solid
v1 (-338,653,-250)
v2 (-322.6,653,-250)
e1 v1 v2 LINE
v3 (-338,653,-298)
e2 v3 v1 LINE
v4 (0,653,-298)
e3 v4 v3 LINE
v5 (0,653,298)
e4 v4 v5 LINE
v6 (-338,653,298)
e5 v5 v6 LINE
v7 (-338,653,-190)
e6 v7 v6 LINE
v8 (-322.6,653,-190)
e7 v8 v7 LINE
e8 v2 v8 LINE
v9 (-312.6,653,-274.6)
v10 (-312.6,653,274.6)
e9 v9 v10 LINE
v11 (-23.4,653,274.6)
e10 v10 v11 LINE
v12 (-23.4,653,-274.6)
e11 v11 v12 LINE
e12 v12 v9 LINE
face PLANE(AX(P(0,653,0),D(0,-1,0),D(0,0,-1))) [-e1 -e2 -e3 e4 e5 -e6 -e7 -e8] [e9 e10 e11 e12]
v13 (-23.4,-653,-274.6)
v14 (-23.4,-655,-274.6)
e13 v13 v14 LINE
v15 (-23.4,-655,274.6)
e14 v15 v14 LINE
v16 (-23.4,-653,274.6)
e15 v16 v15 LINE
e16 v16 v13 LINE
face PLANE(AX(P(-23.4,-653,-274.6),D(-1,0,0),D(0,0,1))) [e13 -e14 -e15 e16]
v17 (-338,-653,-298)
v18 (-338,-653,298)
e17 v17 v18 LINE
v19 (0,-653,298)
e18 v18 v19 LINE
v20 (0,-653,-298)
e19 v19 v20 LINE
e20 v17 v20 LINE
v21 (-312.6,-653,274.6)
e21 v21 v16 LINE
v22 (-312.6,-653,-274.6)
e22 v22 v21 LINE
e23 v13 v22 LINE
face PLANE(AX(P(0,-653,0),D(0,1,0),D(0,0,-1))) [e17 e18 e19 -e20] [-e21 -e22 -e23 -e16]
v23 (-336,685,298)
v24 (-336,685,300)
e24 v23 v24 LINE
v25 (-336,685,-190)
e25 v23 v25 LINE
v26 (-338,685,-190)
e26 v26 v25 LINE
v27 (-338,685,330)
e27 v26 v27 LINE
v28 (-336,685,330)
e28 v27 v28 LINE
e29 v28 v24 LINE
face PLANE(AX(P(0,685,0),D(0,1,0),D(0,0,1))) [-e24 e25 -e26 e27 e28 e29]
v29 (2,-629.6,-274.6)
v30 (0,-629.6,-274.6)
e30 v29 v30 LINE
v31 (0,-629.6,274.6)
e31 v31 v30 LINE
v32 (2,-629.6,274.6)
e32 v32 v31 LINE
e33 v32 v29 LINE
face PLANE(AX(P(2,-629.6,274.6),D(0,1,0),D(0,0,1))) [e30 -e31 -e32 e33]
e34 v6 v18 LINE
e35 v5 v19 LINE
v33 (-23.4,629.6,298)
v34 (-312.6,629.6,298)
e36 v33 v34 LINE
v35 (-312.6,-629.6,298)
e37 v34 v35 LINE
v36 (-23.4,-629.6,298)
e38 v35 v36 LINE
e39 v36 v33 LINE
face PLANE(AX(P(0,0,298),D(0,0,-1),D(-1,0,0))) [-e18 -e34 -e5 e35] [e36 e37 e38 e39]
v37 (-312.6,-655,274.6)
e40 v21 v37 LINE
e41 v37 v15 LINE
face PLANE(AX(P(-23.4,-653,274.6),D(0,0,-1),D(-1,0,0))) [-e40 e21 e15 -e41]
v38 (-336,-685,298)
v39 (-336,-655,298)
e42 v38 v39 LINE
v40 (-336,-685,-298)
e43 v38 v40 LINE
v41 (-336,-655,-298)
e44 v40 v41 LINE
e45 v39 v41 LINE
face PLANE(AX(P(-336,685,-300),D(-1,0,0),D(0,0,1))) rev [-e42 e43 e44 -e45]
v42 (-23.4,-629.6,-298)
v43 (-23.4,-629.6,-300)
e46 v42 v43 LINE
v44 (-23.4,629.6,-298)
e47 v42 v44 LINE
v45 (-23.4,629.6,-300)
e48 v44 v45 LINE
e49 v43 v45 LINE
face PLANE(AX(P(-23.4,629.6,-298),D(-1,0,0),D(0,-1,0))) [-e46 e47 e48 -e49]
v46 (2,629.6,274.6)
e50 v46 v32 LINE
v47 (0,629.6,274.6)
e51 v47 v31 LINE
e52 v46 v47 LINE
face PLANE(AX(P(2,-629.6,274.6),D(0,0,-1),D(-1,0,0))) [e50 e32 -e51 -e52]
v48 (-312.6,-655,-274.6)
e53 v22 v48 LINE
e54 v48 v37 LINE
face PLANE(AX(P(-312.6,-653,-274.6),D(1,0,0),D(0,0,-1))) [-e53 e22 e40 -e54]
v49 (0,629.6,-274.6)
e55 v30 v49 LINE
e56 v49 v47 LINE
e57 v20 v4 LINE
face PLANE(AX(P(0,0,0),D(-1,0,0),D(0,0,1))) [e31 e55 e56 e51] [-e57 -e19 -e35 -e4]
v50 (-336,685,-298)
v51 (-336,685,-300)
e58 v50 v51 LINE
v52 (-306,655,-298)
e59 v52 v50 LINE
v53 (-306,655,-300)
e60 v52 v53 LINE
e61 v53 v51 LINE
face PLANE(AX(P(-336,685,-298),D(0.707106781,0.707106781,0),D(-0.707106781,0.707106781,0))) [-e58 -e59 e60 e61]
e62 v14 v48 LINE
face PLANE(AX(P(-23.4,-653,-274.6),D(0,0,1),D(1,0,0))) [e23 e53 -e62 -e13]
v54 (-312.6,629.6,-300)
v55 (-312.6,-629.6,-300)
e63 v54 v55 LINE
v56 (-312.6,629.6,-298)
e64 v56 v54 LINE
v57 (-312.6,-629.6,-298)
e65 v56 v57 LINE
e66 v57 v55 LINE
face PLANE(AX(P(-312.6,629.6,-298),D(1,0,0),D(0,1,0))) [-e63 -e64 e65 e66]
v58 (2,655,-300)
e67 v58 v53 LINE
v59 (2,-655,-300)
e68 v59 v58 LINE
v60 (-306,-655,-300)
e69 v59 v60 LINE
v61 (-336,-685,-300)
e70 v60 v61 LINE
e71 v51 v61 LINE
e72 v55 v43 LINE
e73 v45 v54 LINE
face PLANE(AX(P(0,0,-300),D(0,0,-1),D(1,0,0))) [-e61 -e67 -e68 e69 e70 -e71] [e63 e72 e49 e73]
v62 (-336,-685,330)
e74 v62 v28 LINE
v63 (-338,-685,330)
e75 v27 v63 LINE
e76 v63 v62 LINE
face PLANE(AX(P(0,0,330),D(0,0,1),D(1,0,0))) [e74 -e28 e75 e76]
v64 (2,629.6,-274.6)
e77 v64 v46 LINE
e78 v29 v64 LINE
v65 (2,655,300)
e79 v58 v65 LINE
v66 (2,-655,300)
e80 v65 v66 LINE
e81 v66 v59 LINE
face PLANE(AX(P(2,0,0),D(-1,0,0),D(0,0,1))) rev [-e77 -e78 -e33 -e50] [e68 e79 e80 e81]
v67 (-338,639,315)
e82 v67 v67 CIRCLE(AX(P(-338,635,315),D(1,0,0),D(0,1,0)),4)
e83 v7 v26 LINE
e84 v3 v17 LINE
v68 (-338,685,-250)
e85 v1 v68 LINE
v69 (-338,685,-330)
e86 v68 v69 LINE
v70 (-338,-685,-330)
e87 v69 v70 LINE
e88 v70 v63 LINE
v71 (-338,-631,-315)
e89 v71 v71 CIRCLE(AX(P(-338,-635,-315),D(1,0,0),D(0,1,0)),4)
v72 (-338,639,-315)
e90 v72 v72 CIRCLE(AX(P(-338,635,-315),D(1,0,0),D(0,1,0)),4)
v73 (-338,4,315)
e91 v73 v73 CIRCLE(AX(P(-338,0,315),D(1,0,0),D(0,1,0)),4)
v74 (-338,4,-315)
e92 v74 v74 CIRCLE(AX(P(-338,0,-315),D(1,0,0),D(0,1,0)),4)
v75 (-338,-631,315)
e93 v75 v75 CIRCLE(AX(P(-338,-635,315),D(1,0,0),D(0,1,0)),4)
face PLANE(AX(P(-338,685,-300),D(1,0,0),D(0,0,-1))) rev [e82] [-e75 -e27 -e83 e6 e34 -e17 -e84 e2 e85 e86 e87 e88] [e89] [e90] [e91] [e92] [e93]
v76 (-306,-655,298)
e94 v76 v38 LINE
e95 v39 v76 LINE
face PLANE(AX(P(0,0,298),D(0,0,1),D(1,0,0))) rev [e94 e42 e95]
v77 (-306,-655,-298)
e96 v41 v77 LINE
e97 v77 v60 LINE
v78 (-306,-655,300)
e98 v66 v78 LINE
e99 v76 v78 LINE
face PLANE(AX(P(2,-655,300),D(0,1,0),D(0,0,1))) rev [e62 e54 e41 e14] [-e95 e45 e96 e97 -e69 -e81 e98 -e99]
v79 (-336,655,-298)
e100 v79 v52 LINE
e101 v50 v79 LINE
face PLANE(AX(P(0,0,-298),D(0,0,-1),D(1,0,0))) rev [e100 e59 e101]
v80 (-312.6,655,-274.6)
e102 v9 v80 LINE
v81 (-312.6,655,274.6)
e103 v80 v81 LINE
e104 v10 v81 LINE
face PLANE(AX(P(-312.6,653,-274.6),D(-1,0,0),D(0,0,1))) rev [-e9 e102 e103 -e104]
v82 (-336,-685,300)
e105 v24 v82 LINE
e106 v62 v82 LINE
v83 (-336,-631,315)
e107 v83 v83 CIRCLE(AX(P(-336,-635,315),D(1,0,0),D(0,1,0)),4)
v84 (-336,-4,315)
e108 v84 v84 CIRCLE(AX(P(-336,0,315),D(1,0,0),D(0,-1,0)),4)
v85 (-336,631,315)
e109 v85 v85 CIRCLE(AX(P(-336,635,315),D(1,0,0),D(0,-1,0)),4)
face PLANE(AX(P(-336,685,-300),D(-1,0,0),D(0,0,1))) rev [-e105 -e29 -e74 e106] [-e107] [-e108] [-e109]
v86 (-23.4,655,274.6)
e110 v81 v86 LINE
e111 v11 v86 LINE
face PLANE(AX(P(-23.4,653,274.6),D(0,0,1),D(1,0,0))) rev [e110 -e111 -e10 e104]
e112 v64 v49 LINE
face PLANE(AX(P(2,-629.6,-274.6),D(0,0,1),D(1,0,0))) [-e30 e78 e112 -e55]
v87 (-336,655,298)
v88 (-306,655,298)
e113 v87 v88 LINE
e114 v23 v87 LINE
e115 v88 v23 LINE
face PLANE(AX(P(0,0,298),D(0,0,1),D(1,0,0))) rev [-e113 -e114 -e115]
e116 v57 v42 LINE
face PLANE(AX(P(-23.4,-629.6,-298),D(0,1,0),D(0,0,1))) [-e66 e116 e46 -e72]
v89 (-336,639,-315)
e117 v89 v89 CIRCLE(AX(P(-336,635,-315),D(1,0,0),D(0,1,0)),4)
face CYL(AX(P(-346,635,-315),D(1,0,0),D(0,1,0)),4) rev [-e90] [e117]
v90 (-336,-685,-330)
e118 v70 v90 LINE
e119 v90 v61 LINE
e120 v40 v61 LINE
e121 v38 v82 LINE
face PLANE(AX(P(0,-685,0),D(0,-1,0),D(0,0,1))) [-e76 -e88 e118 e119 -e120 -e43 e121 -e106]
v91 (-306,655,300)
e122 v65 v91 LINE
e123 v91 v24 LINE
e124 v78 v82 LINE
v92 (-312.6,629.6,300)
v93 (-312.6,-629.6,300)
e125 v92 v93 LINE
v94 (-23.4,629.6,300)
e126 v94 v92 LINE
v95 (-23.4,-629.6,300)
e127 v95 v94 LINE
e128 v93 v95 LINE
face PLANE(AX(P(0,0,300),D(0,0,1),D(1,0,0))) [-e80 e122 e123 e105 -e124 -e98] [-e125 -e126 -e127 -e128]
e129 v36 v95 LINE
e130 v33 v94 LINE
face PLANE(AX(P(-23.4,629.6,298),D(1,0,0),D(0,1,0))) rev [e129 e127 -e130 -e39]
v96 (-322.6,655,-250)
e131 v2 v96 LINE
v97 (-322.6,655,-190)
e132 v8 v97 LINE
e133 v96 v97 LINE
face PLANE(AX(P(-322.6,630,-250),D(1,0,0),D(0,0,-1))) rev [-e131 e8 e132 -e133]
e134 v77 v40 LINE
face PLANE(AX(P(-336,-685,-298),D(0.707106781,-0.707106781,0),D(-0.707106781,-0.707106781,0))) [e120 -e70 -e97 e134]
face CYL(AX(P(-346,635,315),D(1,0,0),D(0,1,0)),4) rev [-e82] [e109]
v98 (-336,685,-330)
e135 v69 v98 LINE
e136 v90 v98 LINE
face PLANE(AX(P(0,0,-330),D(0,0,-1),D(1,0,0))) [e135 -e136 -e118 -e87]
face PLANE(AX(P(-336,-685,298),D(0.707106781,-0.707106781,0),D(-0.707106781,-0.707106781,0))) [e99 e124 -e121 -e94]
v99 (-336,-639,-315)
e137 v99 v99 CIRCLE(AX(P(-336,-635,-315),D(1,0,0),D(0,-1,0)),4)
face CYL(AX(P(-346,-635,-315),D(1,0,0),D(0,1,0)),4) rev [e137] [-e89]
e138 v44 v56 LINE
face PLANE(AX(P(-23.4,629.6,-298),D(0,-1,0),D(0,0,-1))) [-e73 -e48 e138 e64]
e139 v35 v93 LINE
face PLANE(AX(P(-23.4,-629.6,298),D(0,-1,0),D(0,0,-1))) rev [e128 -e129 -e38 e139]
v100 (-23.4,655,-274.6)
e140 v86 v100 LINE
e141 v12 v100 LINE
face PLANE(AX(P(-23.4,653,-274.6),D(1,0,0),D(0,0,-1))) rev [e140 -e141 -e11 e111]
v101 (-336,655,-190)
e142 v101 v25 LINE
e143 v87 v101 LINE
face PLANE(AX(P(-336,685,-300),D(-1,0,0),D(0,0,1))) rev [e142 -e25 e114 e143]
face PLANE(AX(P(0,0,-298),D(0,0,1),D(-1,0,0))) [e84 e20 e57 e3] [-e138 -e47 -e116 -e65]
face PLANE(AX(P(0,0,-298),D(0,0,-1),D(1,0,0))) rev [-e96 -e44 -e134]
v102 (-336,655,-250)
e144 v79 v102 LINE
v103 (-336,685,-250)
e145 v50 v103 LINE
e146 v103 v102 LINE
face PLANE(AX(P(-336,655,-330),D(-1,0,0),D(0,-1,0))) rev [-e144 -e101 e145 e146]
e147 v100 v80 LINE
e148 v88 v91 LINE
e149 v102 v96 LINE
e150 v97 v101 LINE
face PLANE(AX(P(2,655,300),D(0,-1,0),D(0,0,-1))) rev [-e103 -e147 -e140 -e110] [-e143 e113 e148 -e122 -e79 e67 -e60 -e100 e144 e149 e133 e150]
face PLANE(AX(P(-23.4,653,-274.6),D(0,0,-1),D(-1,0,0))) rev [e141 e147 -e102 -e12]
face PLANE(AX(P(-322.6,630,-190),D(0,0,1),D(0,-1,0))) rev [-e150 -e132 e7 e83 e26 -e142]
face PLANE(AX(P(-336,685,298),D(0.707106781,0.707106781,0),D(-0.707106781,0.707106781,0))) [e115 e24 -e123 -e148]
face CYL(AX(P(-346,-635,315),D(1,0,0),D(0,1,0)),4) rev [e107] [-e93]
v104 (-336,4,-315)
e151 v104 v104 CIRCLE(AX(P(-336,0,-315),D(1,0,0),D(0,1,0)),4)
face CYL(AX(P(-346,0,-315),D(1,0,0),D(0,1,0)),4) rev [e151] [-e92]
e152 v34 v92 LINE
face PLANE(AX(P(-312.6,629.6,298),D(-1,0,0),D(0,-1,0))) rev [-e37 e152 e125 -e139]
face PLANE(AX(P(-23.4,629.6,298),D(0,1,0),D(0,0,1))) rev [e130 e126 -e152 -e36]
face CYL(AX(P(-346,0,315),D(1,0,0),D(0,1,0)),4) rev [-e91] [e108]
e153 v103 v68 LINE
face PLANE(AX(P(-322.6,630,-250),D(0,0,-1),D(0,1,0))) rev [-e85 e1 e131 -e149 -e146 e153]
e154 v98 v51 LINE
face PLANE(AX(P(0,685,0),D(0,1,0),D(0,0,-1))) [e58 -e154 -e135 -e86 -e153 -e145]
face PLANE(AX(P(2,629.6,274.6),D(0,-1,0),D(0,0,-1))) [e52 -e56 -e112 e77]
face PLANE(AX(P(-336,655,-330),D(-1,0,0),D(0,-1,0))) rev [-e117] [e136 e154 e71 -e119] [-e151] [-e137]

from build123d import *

# Parameters (mm, degrees)
SKETCH1_W            = 600
SKETCH1_H            = 1310
SKETCH1_W_2          = 549.2
SKETCH1_H_2          = 1259.2
BOSS_EXTRUDE1_DEPTH  = 2
SKETCH2_W            = 340
SKETCH2_H            = 1310
SKETCH2_W_2          = 289.2
SKETCH2_H_2          = 1259.2
BOSS_EXTRUDE2_DEPTH  = 2
SKETCH3_W            = 340
SKETCH3_H            = 600
SKETCH3_W_2          = 289.2
SKETCH3_H_2          = 549.2
BOSS_EXTRUDE3_DEPTH  = 2
SKETCH4_W            = 2
SKETCH4_H            = 1310
BOSS_EXTRUDE4_DEPTH  = 30
SKETCH5_W            = 2
SKETCH5_H            = 600
BOSS_EXTRUDE8_DEPTH  = 30
SKETCH8_W            = 2
SKETCH8_H            = 30
BOSS_EXTRUDE9_DEPTH  = 30
BOSS_EXTRUDE10_DEPTH = 2
SKETCH10_W           = 15.4
SKETCH10_H           = 60
CUT_EXTRUDE2_DEPTH   = 55
SKETCH11_R           = 4
CUT_EXTRUDE3_DEPTH   = 10


with BuildPart() as part:
    # Sketch1 → Boss-Extrude1 (new body)
    with BuildSketch(Plane(origin=(0, 0, 0), x_dir=(0, 0, -1), z_dir=(1, 0, 0))):
        Rectangle(SKETCH1_W, SKETCH1_H)
        Rectangle(SKETCH1_W_2, SKETCH1_H_2, mode=Mode.SUBTRACT)
    extrude(amount=BOSS_EXTRUDE1_DEPTH)

    # Sketch2 → Boss-Extrude2 (add)
    with BuildSketch(Plane.XY.offset(300)):
        with Locations((-168, 0)):
            Rectangle(SKETCH2_W, SKETCH2_H)
        with Locations((-168, 0)):
            Rectangle(SKETCH2_W_2, SKETCH2_H_2, mode=Mode.SUBTRACT)
    boss_extrude2 = extrude(amount=-BOSS_EXTRUDE2_DEPTH)

    # Sketch3 → Boss-Extrude3 (add)
    with BuildSketch(Plane(origin=(0, 655, 0), x_dir=(1, 0, 0), z_dir=(0, 1, 0))):
        with Locations((-168, 0)):
            Rectangle(SKETCH3_W, SKETCH3_H)
        with Locations((-168, 0)):
            Rectangle(SKETCH3_W_2, SKETCH3_H_2, mode=Mode.SUBTRACT)
    boss_extrude3 = extrude(amount=-BOSS_EXTRUDE3_DEPTH)

    # Mirror3: Boss-Extrude3 across plane
    add(boss_extrude3.mirror(Plane.ZX))

    # Mirror4: Boss-Extrude2 across plane
    add(boss_extrude2.mirror(Plane.XY))


with BuildPart() as body_2:
    # Sketch4 → Boss-Extrude4 (new body)
    with BuildSketch(Plane.XY.offset(300)):
        with Locations((-337, 0)):
            Rectangle(SKETCH4_W, SKETCH4_H)
    extrude(amount=BOSS_EXTRUDE4_DEPTH)


with BuildPart() as body_3:
    # Sketch5 → Boss-Extrude8 (new body)
    with BuildSketch(Plane(origin=(0, 655, 0), x_dir=(1, 0, 0), z_dir=(0, 1, 0))):
        with Locations((-337, 0)):
            Rectangle(SKETCH5_W, SKETCH5_H)
    extrude(amount=BOSS_EXTRUDE8_DEPTH)


with BuildPart() as body_4:
    # Sketch8 → Boss-Extrude9 (new body)
    with BuildSketch(Plane(origin=(0, 655, 0), x_dir=(1, 0, 0), z_dir=(0, 1, 0))):
        with Locations((-337, -315)):
            Rectangle(SKETCH8_W, SKETCH8_H)
    extrude(amount=BOSS_EXTRUDE9_DEPTH)


with BuildPart() as body_5:
    # Sketch9 → Boss-Extrude10 (new body)
    with BuildSketch(Plane.XY.offset(300)):
        Polygon((-336, 685), (-306, 655), (-336, 655), align=None)
    extrude(amount=-BOSS_EXTRUDE10_DEPTH)


with BuildPart() as body_6:
    # Mirror2: mirrored copy
    add(body_3.part.mirror(Plane.ZX))


with BuildPart() as body_7:
    # Mirror2 2: mirrored copy
    add(body_5.part.mirror(Plane.ZX))


with BuildPart() as body_8:
    # Mirror2 3: mirrored copy
    add(body_4.part.mirror(Plane.ZX))


with BuildPart() as body_9:
    # Mirror5: mirrored copy
    add(body_5.part.mirror(Plane.XY))


with BuildPart() as body_10:
    # Mirror5 2: mirrored copy
    add(body_4.part.mirror(Plane.XY))


with BuildPart() as body_11:
    # Mirror5 3: mirrored copy
    add(body_2.part.mirror(Plane.XY))


with BuildPart() as body_12:
    # Mirror5 4: mirrored copy
    add(body_7.part.mirror(Plane.XY))


with BuildPart() as body_13:
    # Mirror5 5: mirrored copy
    add(body_8.part.mirror(Plane.XY))


with BuildPart() as cut_extrude2_tool:
    # Sketch10 → Cut-Extrude2 (new body)
    with BuildSketch(Plane(origin=(0, 685, 0), x_dir=(1, 0, 0), z_dir=(0, 1, 0))):
        with Locations((-330.3, 220)):
            Rectangle(SKETCH10_W, SKETCH10_H)
    extrude(amount=-CUT_EXTRUDE2_DEPTH)


with BuildPart() as part_1:
    add(part.part)

    # Cut-Extrude2: cut by cut_extrude2_tool
    add(cut_extrude2_tool.part, mode=Mode.SUBTRACT)


with BuildPart() as body_3_1:
    add(body_3.part)

    # Cut-Extrude2: cut by cut_extrude2_tool
    add(cut_extrude2_tool.part, mode=Mode.SUBTRACT)


with BuildPart() as cut_extrude3_tool:
    # Sketch11 → Cut-Extrude3 (new body)
    with BuildSketch(Plane(origin=(-336, 0, 0), x_dir=(0, 0, -1), z_dir=(1, 0, 0))):
        with Locations(Location((315, 635, 0), (0, 0, 90))):
            Circle(SKETCH11_R)
        with Locations(Location((315, 0, 0), (0, 0, 90))):
            Circle(SKETCH11_R)
        with Locations(Location((315, -635, 0), (0, 0, 90))):
            Circle(SKETCH11_R)
        with Locations(Location((-315, -635, 0), (0, 0, 90))):
            Circle(SKETCH11_R)
        with Locations(Location((-315, 0, 0), (0, 0, 90))):
            Circle(SKETCH11_R)
        with Locations(Location((-315, 635, 0), (0, 0, 90))):
            Circle(SKETCH11_R)
    extrude(amount=-CUT_EXTRUDE3_DEPTH)


with BuildPart() as body_2_1:
    add(body_2.part)

    # Cut-Extrude3: cut by cut_extrude3_tool
    add(cut_extrude3_tool.part, mode=Mode.SUBTRACT)


with BuildPart() as body_11_1:
    add(body_11.part)

    # Cut-Extrude3: cut by cut_extrude3_tool
    add(cut_extrude3_tool.part, mode=Mode.SUBTRACT)


with BuildPart() as part_2:
    add(part_1.part)

    # Combine1: read off the stored shape, not the designer's step
    # Combine1: union body 3, body 12, body 10, body 13, body 6, body 8, body 4, body 2, body 11, body 9, body 7, body 5
    add(body_3_1.part)
    add(body_12.part)
    add(body_10.part)
    add(body_13.part)
    add(body_6.part)
    add(body_8.part)
    add(body_4.part)
    add(body_2_1.part)
    add(body_11_1.part)
    add(body_9.part)
    add(body_7.part)
    add(body_5.part)


solid = part_2.part
